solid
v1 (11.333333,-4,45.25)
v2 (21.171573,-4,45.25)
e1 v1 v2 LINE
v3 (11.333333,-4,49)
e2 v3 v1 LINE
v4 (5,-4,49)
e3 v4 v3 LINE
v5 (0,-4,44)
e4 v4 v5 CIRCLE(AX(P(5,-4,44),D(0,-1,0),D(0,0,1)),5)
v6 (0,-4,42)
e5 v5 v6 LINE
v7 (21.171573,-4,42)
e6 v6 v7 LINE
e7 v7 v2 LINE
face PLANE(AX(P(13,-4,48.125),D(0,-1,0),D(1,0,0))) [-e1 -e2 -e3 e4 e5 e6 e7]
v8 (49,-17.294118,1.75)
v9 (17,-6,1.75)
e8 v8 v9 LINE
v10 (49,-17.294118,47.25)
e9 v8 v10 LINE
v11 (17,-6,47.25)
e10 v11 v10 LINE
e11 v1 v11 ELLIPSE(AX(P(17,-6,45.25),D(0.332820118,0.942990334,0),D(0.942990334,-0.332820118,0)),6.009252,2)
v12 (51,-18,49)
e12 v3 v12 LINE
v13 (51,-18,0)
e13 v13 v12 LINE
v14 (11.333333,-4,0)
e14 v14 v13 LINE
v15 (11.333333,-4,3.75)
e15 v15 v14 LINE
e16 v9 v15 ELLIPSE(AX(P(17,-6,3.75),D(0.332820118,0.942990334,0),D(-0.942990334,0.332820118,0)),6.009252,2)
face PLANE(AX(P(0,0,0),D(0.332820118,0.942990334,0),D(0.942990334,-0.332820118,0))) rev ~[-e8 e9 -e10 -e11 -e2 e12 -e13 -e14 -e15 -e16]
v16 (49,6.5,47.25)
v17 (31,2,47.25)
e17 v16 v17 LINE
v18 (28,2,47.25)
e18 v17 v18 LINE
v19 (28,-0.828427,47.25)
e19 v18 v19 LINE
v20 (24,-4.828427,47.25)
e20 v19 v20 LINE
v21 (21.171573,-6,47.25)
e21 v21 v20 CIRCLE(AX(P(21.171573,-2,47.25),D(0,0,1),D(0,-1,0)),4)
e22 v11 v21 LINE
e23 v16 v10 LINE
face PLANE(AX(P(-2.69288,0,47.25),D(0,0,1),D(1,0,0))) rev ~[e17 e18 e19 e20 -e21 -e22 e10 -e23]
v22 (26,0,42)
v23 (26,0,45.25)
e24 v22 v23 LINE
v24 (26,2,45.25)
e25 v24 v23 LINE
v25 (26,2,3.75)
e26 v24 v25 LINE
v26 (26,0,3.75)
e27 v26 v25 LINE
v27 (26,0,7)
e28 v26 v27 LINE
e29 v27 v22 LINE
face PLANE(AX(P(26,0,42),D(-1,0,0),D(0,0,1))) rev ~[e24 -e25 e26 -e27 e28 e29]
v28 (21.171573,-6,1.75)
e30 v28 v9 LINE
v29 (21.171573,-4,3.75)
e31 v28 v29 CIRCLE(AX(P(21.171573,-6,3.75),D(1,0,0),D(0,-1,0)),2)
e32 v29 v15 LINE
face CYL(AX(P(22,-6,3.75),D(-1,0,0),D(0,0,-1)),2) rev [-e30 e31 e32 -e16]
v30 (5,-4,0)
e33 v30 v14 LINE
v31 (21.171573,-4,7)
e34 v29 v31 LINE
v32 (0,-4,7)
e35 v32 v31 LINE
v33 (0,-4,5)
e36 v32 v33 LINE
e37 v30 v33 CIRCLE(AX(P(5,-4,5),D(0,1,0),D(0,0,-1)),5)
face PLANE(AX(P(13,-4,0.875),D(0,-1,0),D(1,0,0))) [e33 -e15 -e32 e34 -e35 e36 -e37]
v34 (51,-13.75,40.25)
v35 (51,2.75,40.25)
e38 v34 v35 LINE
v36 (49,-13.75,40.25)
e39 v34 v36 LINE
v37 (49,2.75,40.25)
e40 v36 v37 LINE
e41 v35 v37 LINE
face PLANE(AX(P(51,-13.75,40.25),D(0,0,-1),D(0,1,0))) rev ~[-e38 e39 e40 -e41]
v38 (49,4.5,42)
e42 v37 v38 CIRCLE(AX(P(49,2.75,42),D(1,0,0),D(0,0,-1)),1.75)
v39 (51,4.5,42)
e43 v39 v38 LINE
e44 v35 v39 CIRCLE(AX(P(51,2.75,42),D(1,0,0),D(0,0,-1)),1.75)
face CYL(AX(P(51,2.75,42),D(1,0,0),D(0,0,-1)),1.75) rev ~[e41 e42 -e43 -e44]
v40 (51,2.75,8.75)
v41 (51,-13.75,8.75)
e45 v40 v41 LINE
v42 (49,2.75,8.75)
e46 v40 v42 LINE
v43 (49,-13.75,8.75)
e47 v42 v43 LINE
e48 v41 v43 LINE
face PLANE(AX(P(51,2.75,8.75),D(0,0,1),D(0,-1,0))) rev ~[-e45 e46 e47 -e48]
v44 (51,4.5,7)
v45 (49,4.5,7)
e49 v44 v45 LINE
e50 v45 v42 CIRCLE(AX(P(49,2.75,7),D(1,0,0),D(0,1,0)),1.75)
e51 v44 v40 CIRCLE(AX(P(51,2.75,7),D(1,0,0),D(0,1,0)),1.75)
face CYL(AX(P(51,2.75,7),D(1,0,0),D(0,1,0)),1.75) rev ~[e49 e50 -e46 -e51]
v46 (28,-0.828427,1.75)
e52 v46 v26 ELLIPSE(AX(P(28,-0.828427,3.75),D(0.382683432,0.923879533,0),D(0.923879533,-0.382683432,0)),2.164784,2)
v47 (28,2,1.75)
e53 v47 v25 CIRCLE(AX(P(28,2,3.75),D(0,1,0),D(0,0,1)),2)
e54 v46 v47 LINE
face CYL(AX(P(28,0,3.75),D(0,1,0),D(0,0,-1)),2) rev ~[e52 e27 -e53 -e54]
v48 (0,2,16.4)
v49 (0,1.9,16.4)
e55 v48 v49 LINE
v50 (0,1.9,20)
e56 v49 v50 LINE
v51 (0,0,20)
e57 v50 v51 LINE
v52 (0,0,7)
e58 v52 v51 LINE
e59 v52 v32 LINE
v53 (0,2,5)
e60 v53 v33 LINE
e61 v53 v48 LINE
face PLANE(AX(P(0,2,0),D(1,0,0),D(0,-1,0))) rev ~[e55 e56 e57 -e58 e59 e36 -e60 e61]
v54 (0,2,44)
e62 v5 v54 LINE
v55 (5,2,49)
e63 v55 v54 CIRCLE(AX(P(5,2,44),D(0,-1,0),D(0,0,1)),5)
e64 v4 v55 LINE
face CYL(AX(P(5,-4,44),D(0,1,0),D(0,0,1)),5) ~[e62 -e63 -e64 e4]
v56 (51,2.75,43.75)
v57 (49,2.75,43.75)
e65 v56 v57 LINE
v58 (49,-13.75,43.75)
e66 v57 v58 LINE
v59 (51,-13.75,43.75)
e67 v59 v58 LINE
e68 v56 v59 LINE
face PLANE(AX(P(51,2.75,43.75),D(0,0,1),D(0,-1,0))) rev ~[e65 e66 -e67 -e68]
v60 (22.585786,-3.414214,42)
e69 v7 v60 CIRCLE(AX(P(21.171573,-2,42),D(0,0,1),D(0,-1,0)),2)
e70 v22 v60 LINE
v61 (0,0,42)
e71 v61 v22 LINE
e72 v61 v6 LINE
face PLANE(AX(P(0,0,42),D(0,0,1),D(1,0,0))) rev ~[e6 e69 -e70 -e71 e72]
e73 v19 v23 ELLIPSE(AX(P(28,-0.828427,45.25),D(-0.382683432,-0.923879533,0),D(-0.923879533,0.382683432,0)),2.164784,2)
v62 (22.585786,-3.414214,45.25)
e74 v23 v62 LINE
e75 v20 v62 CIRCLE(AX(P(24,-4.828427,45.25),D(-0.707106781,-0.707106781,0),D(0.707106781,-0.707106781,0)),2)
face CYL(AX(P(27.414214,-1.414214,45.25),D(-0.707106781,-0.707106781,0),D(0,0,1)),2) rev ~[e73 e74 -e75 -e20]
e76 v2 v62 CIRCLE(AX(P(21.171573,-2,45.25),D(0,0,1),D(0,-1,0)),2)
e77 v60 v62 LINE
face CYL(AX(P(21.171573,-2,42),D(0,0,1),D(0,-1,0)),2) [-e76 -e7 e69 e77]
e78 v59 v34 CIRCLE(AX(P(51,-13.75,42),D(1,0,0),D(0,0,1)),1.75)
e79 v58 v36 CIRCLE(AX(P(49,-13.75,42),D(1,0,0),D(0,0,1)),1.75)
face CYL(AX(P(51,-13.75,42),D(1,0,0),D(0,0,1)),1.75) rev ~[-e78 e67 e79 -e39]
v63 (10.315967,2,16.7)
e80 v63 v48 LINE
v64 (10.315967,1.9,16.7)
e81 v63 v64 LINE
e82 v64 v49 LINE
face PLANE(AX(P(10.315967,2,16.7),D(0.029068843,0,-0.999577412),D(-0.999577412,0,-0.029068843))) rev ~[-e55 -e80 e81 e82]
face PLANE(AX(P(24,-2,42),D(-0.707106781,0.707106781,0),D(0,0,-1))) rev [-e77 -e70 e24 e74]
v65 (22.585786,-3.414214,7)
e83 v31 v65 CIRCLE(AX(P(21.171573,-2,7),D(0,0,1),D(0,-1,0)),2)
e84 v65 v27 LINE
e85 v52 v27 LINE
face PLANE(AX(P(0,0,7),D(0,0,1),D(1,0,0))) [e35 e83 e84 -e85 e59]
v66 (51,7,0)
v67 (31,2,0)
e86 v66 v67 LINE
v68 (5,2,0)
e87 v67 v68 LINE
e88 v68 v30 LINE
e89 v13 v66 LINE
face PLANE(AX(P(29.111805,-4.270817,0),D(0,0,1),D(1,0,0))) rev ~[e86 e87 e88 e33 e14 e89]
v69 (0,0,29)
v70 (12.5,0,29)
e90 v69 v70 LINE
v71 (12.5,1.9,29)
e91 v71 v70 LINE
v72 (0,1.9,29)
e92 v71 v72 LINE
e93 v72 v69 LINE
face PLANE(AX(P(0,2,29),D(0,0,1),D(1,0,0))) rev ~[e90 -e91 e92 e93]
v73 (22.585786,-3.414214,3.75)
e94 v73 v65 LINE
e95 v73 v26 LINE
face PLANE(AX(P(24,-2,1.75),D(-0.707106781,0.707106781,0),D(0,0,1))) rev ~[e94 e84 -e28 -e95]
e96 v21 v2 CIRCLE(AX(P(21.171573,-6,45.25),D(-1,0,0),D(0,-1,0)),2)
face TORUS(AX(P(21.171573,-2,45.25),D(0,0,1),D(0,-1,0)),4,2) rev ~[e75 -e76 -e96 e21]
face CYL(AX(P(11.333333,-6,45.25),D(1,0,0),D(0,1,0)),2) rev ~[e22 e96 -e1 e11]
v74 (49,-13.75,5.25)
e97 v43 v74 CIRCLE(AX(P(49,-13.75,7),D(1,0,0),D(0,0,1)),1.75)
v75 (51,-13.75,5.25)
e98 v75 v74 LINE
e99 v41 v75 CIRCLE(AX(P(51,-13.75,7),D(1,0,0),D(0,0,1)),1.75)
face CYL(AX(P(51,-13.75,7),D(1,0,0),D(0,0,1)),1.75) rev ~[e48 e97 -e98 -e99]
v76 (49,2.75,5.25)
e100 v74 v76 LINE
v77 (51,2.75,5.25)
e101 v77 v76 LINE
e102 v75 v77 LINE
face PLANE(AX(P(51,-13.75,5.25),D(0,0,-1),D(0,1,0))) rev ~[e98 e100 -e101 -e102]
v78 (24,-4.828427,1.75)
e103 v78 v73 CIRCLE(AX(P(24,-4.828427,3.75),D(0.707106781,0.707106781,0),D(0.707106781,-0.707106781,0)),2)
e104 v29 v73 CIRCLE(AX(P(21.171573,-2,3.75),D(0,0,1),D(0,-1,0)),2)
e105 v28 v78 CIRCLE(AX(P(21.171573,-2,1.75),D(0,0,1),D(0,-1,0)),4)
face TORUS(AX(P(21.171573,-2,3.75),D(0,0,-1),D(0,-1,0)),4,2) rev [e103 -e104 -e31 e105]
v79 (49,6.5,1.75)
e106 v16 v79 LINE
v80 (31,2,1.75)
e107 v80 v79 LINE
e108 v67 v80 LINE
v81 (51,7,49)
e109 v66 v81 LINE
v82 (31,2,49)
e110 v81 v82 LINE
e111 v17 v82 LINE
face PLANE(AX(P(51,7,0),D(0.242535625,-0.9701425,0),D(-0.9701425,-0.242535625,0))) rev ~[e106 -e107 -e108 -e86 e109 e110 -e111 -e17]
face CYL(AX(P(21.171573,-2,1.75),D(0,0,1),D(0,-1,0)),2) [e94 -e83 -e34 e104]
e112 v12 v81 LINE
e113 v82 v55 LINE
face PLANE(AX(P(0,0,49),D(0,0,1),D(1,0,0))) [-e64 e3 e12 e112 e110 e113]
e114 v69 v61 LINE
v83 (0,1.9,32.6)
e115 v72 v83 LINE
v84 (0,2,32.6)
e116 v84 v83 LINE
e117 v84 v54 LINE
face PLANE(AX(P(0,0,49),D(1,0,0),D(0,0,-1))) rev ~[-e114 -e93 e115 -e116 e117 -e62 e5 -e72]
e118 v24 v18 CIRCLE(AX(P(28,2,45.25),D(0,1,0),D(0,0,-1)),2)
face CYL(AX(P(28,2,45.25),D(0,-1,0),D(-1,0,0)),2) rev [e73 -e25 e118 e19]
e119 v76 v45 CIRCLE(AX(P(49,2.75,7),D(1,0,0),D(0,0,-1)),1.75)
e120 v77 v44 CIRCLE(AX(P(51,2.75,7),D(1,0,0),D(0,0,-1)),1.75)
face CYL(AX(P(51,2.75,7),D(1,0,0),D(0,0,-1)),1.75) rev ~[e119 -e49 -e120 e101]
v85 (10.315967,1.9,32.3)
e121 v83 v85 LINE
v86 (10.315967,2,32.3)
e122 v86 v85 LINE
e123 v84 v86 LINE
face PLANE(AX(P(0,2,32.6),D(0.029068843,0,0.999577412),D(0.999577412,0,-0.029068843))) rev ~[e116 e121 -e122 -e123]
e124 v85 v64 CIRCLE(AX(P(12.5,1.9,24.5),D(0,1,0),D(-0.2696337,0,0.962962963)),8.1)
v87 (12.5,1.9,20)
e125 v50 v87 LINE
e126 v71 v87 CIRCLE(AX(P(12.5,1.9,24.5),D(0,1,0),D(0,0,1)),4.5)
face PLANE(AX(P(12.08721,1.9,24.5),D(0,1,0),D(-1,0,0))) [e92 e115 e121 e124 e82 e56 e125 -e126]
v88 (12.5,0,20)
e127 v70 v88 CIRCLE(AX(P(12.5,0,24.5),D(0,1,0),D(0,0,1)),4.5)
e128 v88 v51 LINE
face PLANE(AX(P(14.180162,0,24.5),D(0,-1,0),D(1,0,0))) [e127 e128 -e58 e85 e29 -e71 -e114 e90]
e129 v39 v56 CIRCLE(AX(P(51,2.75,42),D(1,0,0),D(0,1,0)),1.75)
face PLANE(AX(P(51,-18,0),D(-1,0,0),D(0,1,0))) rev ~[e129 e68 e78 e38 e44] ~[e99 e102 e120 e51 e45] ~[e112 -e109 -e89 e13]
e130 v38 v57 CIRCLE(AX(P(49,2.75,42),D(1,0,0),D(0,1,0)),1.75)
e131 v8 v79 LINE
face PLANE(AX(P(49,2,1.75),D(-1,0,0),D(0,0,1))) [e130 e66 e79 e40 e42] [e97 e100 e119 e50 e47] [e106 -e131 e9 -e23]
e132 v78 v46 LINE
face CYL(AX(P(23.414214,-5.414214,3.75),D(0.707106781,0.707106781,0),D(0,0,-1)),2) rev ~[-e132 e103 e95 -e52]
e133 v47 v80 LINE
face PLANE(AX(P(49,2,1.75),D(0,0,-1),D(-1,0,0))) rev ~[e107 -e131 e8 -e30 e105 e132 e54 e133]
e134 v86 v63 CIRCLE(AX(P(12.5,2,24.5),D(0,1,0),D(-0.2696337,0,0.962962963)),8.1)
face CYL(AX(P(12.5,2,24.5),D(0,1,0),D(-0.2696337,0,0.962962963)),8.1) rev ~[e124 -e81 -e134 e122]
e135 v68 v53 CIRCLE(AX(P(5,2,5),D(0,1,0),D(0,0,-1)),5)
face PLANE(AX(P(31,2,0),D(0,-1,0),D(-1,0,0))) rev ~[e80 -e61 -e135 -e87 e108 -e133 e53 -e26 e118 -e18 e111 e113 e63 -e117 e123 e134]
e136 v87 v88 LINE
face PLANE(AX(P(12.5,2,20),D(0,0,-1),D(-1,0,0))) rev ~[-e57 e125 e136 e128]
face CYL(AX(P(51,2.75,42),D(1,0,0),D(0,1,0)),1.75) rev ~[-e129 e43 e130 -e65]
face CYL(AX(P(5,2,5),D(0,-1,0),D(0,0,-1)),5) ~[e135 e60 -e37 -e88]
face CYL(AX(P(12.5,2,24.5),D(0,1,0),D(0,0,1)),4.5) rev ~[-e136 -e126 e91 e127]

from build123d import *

# Parameters (mm, degrees)
F1_DEPTH  = 49
F3_DEPTH  = 8.001
F4_W      = 18
F4_H      = 45.5
F4_W_2    = 5
F5_DEPTH  = 25
F7_DEPTH  = 2
F8_W      = 33.7460841984
F8_H      = 45.5
F9_DEPTH  = 18.001
F11_DEPTH = 0.1
F12_W     = 26
F12_H     = 1.75
F12_H_2   = 5.25
F13_DEPTH = 4
F14_SIZE  = 4
F15_R     = 2
F16_R     = 5


# Not quite as in the source:
# - a feature names something its author has since deleted; it is built from what else it names


with BuildPart() as f1:
    # F0 (on Top) → F1 (new body)
    with BuildSketch(Plane.XY):
        Polygon((31, 2), (0, 2), (0, 0), (51, -18), (51, 2), align=None)
        Polygon((51, 7), (31, 2), (51, 2), align=None)
    extrude(amount=F1_DEPTH)

    # F2 (on face) → F3 (cut, through all)
    with BuildSketch(Plane(origin=(0, 2, 0), x_dir=(-1, 0, 0), z_dir=(0, 1, 0))):
        with BuildLine():
            Line((0, 29), (-12.5, 29))
            ThreePointArc((-12.5, 29), (-17, 24.5), (-12.5, 20))
            Line((-12.5, 20), (0, 20))
            Line((0, 20), (0, 29))
        make_face()
    extrude(amount=-F3_DEPTH, mode=Mode.SUBTRACT)

    # F4 (on face) → F5 (cut, symmetric)
    with BuildSketch(Plane(origin=(0, 2, 0), x_dir=(-1, 0, 0), z_dir=(0, 1, 0))):
        with Locations((-40, 24.5)):
            Rectangle(F4_W, F4_H)
        with Locations((-28.5, 24.5)):
            Rectangle(F4_W_2, F4_H)
    extrude(amount=F5_DEPTH, both=True, mode=Mode.SUBTRACT)

    # F6 (on face) → F7 (cut, through all)
    with BuildSketch(Plane.YZ.offset(51)):
        with BuildLine():
            ThreePointArc((2.75, 40.25), (1, 42), (2.75, 43.75))
            Line((2.75, 43.75), (-13.75, 43.75))
            ThreePointArc((-13.75, 43.75), (-12.5125631329, 43.2374368671), (-12, 42))
            ThreePointArc((-12, 42), (-12.5125631329, 40.7625631329), (-13.75, 40.25))
            Line((-13.75, 40.25), (2.75, 40.25))
        make_face()
        with BuildLine():
            ThreePointArc((-12, 42), (-12.5125631329, 43.2374368671), (-13.75, 43.75))
            ThreePointArc((-13.75, 43.75), (-15.5, 42), (-13.75, 40.25))
            ThreePointArc((-13.75, 40.25), (-12.5125631329, 40.7625631329), (-12, 42))
        make_face()
        with BuildLine():
            ThreePointArc((2.75, 40.25), (3.9874368671, 40.7625631329), (4.5, 42))
            ThreePointArc((4.5, 42), (3.9874368671, 43.2374368671), (2.75, 43.75))
            ThreePointArc((2.75, 43.75), (1, 42), (2.75, 40.25))
        make_face()
        with BuildLine():
            ThreePointArc((2.75, 5.25), (1, 7), (2.75, 8.75))
            Line((2.75, 8.75), (-13.75, 8.75))
            ThreePointArc((-13.75, 8.75), (-12.5125631329, 8.2374368671), (-12, 7))
            ThreePointArc((-12, 7), (-12.5125631329, 5.7625631329), (-13.75, 5.25))
            Line((-13.75, 5.25), (2.75, 5.25))
        make_face()
        with BuildLine():
            ThreePointArc((-12, 7), (-12.5125631329, 8.2374368671), (-13.75, 8.75))
            ThreePointArc((-13.75, 8.75), (-15.5, 7), (-13.75, 5.25))
            ThreePointArc((-13.75, 5.25), (-12.5125631329, 5.7625631329), (-12, 7))
        make_face()
        with BuildLine():
            ThreePointArc((4.5, 7), (3.9874368671, 8.2374368671), (2.75, 8.75))
            ThreePointArc((2.75, 8.75), (1, 7), (2.75, 5.25))
            ThreePointArc((2.75, 5.25), (3.9874368671, 5.7625631329), (4.5, 7))
        make_face()
    extrude(amount=-F7_DEPTH, mode=Mode.SUBTRACT)

    # F8 (on Front) → F9 (cut, through all)
    with BuildSketch(Plane.XZ):
        with Locations((14.1801619902, 24.5)):
            Rectangle(F8_W, F8_H)
    extrude(amount=F9_DEPTH, mode=Mode.SUBTRACT)

    # F10 (on face) → F11 (cut)
    with BuildSketch(Plane(origin=(0, 2, 0), x_dir=(-1, 0, 0), z_dir=(0, 1, 0))):
        with BuildLine():
            ThreePointArc((-10.3159670332, 16.7), (-6.0462930408, 19.6051387676), (-4.4, 24.5))
            ThreePointArc((-4.4, 24.5), (-6.0462930408, 29.3948612324), (-10.3159670332, 32.3))
            ThreePointArc((-10.3159670332, 32.3), (-20.6, 24.5), (-10.3159670332, 16.7))
        make_face()
        with BuildLine():
            ThreePointArc((-10.3159670332, 32.3), (-6.0462930408, 29.3948612324), (-4.4, 24.5))
            ThreePointArc((-4.4, 24.5), (-6.0462930408, 19.6051387676), (-10.3159670332, 16.7))
            Line((-10.3159670332, 16.7), (0, 16.4))
            Line((0, 16.4), (0, 32.6))
            Line((0, 32.6), (-10.3159670332, 32.3))
        make_face()
    extrude(amount=-F11_DEPTH, mode=Mode.SUBTRACT)

    # F12 (on face) → F13 (join)
    with BuildSketch(Plane.XZ):
        with Locations((13, 48.125)):
            Rectangle(F12_W, F12_H)
        with Locations((13, 0.875)):
            Rectangle(F12_W, F12_H)
        with Locations((13, 44.625)):
            Rectangle(F12_W, F12_H_2)
        with Locations((13, 4.375)):
            Rectangle(F12_W, F12_H_2)
    extrude(amount=F13_DEPTH)

    # F14
    f14_edges = [f1.edges().sort_by_distance(p)[0] for p in [
        (26, -4, 4.375),
        (26, -4, 44.625),
    ]]
    chamfer(f14_edges, length=F14_SIZE)

    # F15
    f15_edges = [f1.edges().sort_by_distance(p)[0] for p in [
        (16.666667, -4, 1.75),
        (16.666667, -4, 47.25),
        (24, -2, 47.25),
        (24, -2, 1.75),
        (22, -4, 4.375),
        (22, -4, 44.625),
        (26, 1, 1.75),
        (26, 1, 47.25),
    ]]
    fillet(f15_edges, radius=F15_R)

    # F16
    f16_edges = [f1.edges().sort_by_distance(p)[0] for p in [
        (0, -1, 49),
        (0, -1, 0),
    ]]
    fillet(f16_edges, radius=F16_R)


solid = f1.part
